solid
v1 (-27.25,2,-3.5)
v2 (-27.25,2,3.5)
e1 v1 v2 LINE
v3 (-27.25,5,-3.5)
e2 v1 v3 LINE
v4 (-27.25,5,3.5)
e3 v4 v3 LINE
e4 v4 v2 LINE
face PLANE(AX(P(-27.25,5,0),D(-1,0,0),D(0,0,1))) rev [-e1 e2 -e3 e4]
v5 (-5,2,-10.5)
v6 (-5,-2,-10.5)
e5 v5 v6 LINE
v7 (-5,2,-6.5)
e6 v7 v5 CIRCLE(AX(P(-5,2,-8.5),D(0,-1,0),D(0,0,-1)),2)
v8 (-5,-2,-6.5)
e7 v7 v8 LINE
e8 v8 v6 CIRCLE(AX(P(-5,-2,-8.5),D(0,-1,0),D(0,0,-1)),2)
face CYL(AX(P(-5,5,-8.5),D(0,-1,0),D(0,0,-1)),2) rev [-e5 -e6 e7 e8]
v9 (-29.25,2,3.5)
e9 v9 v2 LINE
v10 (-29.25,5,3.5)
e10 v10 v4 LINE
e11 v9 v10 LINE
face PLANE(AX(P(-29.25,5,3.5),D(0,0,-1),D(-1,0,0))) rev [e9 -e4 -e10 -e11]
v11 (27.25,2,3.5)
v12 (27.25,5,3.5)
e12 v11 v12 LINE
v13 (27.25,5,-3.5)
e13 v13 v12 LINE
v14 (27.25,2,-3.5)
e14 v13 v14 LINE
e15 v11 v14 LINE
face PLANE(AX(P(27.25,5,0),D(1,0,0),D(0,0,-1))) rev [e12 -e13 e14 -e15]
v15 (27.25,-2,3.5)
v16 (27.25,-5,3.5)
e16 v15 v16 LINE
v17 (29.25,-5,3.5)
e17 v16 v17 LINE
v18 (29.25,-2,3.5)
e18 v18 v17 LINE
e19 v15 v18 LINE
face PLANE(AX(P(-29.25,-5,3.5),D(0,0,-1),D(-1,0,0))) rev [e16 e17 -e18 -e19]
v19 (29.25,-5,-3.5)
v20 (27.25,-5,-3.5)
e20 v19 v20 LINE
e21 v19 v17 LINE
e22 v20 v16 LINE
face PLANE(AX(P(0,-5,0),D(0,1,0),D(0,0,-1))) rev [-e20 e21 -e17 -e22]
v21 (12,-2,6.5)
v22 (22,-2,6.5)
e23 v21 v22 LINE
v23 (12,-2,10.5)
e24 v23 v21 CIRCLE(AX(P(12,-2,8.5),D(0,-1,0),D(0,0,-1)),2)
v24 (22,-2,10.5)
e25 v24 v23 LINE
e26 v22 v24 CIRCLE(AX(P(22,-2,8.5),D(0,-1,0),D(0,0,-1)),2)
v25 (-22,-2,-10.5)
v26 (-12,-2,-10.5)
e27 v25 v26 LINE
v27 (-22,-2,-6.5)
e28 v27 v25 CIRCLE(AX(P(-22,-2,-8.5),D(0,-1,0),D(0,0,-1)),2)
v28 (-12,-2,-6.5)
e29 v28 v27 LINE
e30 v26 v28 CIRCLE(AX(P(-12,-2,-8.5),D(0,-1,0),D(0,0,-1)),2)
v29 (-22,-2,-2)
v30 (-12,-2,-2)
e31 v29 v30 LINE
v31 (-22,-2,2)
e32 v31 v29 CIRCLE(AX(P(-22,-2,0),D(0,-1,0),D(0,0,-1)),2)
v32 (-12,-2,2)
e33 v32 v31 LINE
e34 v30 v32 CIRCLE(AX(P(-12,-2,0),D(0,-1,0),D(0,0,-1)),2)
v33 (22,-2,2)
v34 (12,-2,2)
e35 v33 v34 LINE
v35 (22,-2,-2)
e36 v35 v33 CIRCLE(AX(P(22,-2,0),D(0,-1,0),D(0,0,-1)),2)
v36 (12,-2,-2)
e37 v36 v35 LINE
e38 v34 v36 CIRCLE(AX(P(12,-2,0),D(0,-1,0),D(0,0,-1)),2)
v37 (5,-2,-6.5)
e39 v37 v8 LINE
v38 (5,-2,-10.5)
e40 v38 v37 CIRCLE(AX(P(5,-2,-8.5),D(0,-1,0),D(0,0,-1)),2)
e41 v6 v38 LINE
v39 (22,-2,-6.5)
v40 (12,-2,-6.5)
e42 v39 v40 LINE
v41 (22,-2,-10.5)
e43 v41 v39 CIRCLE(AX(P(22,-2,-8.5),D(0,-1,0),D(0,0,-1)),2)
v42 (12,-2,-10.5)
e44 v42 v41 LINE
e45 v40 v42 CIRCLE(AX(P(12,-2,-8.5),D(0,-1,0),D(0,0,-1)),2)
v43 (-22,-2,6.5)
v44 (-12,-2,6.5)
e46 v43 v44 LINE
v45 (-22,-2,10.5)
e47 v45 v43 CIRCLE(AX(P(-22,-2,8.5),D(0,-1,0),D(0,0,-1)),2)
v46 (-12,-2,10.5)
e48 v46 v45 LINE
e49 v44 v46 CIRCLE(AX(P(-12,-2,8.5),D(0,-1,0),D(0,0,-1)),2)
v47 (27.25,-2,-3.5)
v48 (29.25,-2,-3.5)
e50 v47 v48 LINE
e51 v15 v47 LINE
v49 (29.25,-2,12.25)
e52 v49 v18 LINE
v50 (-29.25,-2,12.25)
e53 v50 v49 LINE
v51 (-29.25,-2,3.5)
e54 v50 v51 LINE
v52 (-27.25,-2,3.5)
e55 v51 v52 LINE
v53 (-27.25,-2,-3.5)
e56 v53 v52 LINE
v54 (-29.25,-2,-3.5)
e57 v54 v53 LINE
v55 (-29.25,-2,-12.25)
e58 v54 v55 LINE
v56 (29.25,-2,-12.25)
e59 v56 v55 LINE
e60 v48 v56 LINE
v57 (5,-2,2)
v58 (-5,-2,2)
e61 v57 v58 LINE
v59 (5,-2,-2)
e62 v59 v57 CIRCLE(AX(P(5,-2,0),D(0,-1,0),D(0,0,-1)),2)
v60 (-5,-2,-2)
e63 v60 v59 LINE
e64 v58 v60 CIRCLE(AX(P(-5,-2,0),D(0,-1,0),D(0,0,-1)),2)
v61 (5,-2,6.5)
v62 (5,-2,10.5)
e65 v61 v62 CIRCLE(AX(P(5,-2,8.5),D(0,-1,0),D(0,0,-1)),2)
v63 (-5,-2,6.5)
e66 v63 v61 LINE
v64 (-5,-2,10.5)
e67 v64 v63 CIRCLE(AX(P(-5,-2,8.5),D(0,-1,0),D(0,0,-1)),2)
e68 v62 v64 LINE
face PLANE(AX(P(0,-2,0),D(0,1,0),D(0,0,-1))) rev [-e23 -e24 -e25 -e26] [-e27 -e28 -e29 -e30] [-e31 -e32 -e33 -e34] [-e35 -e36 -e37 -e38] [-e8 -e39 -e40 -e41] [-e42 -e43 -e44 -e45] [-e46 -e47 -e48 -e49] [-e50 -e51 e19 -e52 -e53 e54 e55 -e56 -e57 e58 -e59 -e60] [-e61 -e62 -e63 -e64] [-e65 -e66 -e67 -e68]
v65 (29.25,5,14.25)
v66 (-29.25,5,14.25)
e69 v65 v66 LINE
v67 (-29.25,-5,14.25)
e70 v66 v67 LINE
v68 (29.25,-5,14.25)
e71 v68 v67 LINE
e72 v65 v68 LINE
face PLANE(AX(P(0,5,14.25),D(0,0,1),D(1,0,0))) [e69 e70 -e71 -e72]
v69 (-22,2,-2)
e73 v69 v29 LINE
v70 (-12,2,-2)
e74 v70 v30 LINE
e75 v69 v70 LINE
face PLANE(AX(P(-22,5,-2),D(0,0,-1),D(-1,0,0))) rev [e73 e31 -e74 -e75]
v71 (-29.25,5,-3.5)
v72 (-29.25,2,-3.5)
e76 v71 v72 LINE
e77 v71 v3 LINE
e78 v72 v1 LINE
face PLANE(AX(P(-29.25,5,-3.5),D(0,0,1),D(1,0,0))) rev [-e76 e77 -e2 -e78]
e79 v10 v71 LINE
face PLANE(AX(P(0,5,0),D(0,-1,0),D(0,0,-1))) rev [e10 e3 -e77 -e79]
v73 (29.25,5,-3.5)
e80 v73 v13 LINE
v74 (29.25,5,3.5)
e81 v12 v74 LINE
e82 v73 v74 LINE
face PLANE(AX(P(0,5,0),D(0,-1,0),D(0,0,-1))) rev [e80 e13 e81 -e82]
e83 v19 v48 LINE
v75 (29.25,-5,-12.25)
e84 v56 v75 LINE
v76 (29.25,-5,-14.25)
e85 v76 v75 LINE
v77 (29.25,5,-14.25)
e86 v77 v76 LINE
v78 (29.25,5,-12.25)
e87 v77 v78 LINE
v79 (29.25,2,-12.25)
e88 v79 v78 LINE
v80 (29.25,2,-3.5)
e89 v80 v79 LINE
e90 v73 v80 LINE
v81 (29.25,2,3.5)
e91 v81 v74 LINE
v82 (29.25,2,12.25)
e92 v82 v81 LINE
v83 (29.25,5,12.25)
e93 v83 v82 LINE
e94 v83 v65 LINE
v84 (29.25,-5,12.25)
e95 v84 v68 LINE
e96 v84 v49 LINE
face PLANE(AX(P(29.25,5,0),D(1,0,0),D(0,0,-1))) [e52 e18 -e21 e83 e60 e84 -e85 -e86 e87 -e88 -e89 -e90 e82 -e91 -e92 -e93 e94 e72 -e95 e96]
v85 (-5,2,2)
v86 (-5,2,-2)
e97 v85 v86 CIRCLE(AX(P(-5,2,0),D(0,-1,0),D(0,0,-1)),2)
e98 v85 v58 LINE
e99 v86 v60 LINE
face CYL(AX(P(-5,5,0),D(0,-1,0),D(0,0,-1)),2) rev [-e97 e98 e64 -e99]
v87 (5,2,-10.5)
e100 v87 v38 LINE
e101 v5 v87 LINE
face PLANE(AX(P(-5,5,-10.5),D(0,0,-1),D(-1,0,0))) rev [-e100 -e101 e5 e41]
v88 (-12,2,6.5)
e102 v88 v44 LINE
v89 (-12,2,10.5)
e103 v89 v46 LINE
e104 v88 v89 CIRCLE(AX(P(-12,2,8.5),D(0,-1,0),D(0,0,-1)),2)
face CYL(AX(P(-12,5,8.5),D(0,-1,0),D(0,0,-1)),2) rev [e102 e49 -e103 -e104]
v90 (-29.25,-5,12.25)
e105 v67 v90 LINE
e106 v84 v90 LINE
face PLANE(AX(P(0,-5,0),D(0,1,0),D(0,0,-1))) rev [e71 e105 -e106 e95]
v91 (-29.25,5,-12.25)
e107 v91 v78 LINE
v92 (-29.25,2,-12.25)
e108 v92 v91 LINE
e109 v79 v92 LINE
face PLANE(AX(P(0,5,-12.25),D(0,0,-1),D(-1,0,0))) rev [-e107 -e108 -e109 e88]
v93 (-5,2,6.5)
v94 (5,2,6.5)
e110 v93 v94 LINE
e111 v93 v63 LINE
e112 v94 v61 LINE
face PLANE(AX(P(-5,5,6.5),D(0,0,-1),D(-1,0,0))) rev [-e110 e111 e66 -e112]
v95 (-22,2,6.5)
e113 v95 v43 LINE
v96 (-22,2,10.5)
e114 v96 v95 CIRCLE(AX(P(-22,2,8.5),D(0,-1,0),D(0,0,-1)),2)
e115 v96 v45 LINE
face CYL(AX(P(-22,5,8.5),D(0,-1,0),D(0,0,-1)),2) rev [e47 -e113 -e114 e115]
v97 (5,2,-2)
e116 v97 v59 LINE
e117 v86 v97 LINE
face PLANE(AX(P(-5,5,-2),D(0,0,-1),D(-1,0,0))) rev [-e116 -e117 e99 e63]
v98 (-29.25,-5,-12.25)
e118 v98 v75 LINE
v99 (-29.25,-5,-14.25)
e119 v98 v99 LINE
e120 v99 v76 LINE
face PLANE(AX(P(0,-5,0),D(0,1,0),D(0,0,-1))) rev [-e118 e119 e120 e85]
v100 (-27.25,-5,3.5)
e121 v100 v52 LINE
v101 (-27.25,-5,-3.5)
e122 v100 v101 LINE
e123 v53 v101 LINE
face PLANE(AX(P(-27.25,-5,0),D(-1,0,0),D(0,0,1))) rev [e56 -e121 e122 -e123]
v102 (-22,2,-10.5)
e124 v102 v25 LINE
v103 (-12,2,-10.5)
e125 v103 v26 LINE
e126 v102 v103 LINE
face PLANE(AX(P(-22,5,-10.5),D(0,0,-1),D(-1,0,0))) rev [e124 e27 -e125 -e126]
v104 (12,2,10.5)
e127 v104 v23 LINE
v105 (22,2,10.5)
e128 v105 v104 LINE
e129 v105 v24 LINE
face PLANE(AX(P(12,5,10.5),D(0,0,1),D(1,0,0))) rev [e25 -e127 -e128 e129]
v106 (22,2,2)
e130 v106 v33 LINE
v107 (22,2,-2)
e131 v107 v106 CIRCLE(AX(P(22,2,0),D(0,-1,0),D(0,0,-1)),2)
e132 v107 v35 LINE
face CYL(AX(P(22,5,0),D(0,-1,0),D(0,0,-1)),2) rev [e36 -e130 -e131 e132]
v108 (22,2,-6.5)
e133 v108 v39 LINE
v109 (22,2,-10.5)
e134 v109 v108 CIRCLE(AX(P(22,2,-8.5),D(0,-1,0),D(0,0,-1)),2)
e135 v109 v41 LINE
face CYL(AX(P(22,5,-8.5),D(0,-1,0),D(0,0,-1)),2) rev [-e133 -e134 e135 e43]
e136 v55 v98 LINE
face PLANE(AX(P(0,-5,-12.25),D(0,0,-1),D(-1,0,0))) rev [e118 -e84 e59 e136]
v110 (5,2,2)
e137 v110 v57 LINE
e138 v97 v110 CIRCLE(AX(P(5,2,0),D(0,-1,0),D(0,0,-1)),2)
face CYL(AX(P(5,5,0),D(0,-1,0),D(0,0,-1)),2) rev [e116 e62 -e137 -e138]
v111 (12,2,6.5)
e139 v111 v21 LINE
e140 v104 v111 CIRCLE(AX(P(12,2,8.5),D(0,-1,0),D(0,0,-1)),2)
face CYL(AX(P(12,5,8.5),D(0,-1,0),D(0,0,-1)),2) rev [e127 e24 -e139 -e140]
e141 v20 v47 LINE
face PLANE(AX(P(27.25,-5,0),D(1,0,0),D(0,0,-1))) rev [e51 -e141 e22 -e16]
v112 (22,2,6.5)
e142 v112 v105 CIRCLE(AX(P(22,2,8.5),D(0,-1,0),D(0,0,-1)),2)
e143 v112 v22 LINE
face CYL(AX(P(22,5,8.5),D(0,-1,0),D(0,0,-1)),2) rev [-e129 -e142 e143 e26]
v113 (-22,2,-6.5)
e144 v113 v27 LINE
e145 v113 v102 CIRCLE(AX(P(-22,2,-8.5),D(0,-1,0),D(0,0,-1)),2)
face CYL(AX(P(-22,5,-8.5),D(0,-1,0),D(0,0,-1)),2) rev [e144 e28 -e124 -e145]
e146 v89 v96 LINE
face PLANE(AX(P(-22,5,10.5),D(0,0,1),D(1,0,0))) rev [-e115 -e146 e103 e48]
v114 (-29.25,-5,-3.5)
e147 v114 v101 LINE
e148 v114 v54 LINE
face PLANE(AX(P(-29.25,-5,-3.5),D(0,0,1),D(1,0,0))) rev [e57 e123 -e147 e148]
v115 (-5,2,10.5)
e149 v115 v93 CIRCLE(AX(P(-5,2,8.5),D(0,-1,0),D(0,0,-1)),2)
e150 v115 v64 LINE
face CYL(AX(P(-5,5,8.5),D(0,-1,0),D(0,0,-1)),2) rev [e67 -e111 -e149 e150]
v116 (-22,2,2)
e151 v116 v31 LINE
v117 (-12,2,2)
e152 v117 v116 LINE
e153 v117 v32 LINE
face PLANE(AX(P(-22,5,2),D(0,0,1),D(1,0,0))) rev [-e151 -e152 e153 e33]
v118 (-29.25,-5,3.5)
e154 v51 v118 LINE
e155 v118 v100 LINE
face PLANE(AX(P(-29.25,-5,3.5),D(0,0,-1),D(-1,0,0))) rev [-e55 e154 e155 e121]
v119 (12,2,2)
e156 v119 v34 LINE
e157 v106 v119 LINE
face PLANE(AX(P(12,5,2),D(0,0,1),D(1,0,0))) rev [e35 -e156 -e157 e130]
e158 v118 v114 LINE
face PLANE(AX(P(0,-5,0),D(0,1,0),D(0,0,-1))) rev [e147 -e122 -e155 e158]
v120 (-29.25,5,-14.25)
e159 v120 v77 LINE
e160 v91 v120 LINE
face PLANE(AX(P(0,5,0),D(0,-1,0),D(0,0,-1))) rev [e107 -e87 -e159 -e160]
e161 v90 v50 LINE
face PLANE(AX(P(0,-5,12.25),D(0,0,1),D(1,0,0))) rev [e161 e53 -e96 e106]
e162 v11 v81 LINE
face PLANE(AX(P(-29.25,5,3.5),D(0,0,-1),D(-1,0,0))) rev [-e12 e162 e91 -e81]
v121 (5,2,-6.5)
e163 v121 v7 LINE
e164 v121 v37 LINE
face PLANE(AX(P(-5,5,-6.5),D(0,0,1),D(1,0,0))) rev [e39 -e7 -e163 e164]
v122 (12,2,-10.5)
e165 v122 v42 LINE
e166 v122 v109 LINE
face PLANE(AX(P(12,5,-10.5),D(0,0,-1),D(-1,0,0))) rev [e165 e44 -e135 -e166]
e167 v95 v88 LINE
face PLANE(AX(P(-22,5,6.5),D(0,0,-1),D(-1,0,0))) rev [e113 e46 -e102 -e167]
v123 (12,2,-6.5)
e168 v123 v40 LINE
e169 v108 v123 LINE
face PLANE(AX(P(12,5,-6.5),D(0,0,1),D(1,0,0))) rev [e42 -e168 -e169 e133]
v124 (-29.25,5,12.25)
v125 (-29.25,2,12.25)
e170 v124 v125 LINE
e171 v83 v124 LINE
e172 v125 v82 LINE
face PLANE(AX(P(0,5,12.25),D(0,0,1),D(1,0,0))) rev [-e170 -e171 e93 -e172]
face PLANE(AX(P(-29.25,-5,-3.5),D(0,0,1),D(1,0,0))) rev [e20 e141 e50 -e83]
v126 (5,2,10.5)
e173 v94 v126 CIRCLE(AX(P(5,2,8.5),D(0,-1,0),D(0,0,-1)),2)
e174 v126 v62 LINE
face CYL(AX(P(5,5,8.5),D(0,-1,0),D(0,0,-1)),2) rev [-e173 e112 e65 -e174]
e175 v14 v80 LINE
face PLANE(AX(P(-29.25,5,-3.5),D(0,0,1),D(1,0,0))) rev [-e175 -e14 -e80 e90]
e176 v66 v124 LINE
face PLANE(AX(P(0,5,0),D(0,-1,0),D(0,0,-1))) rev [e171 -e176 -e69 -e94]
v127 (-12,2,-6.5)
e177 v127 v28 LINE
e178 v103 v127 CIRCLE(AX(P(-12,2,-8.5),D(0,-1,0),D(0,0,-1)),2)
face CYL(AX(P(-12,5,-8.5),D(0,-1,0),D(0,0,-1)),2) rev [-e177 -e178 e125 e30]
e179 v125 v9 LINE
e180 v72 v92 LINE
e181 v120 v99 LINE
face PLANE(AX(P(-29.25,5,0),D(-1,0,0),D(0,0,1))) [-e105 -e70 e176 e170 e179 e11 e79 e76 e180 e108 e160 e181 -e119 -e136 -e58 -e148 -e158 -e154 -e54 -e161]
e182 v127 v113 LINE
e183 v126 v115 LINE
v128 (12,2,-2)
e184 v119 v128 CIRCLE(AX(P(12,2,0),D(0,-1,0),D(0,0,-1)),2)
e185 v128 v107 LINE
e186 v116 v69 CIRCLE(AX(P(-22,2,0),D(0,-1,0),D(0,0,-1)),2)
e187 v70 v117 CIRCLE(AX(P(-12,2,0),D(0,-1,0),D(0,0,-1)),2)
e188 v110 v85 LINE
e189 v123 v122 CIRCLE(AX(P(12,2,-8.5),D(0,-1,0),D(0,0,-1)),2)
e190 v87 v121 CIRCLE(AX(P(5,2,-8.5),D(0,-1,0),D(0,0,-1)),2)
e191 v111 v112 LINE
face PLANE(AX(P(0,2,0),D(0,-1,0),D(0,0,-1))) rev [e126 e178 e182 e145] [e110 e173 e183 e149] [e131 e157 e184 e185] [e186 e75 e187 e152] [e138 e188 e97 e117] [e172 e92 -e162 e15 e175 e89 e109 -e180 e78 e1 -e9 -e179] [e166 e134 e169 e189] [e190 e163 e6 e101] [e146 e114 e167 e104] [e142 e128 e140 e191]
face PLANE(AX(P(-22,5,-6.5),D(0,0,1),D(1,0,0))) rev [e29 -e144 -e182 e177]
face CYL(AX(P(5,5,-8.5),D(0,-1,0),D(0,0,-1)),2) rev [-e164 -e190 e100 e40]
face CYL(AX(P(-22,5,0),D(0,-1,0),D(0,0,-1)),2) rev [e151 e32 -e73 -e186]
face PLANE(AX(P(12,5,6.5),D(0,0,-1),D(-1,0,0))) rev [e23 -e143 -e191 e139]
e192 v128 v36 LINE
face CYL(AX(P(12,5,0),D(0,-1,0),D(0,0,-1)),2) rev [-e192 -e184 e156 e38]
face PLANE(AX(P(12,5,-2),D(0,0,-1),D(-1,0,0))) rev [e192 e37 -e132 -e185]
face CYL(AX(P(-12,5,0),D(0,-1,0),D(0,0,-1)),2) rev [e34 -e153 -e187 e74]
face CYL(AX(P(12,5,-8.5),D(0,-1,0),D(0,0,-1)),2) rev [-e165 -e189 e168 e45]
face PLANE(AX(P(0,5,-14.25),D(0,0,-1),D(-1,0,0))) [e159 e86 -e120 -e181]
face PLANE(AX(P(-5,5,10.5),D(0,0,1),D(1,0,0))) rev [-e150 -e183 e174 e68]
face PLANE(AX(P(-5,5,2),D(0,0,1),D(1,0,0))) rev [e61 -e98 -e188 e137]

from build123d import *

# Parameters (mm, degrees)
SKETCH1_W           = 54.5
SKETCH1_H           = 24.5
BOSS_EXTRUDE1_DEPTH = 2
BOSS_EXTRUDE2_START = -2
SKETCH2_W           = 58.5
SKETCH2_H           = 28.5
SKETCH2_W_2         = 54.5
SKETCH2_H_2         = 24.5
BOSS_EXTRUDE2_DEPTH = 5
CUT_EXTRUDE1_DEPTH  = 33.918459867
FILL_PATTERN1_DEPTH = 2
LPATTERN1_COUNT     = 2
LPATTERN1_PITCH     = 8.5
LPATTERN1_COL_COUNT = 2
LPATTERN1_COL_PITCH = 8.5
SKETCH13_W          = 8.75
SKETCH13_H          = 3
CUT_EXTRUDE2_DEPTH  = 61.417816081


# Read off the part's stored shape, not the designer's step: Fill Pattern1
with BuildPart() as part:
    # Sketch1 → Boss-Extrude1 (new body)
    with BuildSketch(Plane(origin=(0, 0, 0), x_dir=(1, 0, 0), z_dir=(0, 1, 0))):
        Rectangle(SKETCH1_W, SKETCH1_H)
    extrude(amount=BOSS_EXTRUDE1_DEPTH)

    # Sketch2 → Boss-Extrude2 (add)
    with BuildSketch(Plane(origin=(0, 2, 0), x_dir=(1, 0, 0), z_dir=(0, 1, 0)).offset(BOSS_EXTRUDE2_START)):
        Rectangle(SKETCH2_W, SKETCH2_H)
        Rectangle(SKETCH2_W_2, SKETCH2_H_2, mode=Mode.SUBTRACT)
    extrude(amount=BOSS_EXTRUDE2_DEPTH)

    # Sketch5 → Cut-Extrude1 (cut, through all)
    with BuildSketch(Plane.XZ):
        with BuildLine():
            Line((-5, 2), (5, 2))
            ThreePointArc((5, 2), (7, 0), (5, -2))
            Line((5, -2), (-5, -2))
            ThreePointArc((-5, -2), (-7, 0), (-5, 2))
        make_face()
    cut_extrude1 = extrude(amount=-CUT_EXTRUDE1_DEPTH, mode=Mode.SUBTRACT)

    # Fill Pattern1 outline → Fill Pattern1 (cut)
    with BuildSketch(Plane(origin=(0, 0, 0), x_dir=(1, 0, 0), z_dir=(0, 1, 0))):
        with BuildLine():
            ThreePointArc((-22, 2), (-24, 0), (-22, -2))
            Line((-22, -2), (-12, -2))
            ThreePointArc((-12, -2), (-10, 0), (-12, 2))
            Line((-12, 2), (-22, 2))
        make_face()
        with BuildLine():
            ThreePointArc((12, 2), (10, 0), (12, -2))
            Line((12, -2), (22, -2))
            ThreePointArc((22, -2), (24, 0), (22, 2))
            Line((22, 2), (12, 2))
        make_face()
        with BuildLine():
            ThreePointArc((-22, 10.5), (-24, 8.5), (-22, 6.5))
            Line((-22, 6.5), (-12, 6.5))
            ThreePointArc((-12, 6.5), (-10, 8.5), (-12, 10.5))
            Line((-12, 10.5), (-22, 10.5))
        make_face()
        with BuildLine():
            ThreePointArc((12, 10.5), (10, 8.5), (12, 6.5))
            Line((12, 6.5), (22, 6.5))
            ThreePointArc((22, 6.5), (24, 8.5), (22, 10.5))
            Line((22, 10.5), (12, 10.5))
        make_face()
        with BuildLine():
            ThreePointArc((-22, -6.5), (-24, -8.5), (-22, -10.5))
            Line((-22, -10.5), (-12, -10.5))
            ThreePointArc((-12, -10.5), (-10, -8.5), (-12, -6.5))
            Line((-12, -6.5), (-22, -6.5))
        make_face()
        with BuildLine():
            ThreePointArc((12, -6.5), (10, -8.5), (12, -10.5))
            Line((12, -10.5), (22, -10.5))
            ThreePointArc((22, -10.5), (24, -8.5), (22, -6.5))
            Line((22, -6.5), (12, -6.5))
        make_face()
    extrude(amount=FILL_PATTERN1_DEPTH, mode=Mode.SUBTRACT)

    # LPattern1: Cut-Extrude1 ×2
    with Locations(*[(0, 0, i * LPATTERN1_PITCH) for i in range(1, LPATTERN1_COUNT)]):
        add(cut_extrude1, mode=Mode.SUBTRACT)

    # LPattern1 col: Cut-Extrude1 ×2
    with Locations(*[(0, 0, -i * LPATTERN1_COL_PITCH) for i in range(1, LPATTERN1_COL_COUNT)]):
        add(cut_extrude1, mode=Mode.SUBTRACT)

    # Sketch13 → Cut-Extrude2 (cut, through all)
    with BuildSketch(Plane(origin=(29.25, 0, 0), x_dir=(0, 0, -1), z_dir=(1, 0, 0))):
        with Locations((-7.875, 3.5)):
            Rectangle(SKETCH13_W, SKETCH13_H)
        with Locations((7.875, 3.5)):
            Rectangle(SKETCH13_W, SKETCH13_H)
    extrude(amount=-CUT_EXTRUDE2_DEPTH, mode=Mode.SUBTRACT)

    # Mirror1: part across plane


with BuildPart() as part_1:
    add(part.part)
    add(part.part.mirror(Plane(origin=(0, 0, 0), x_dir=(0, 0, 1), z_dir=(0, -1, 0))))


solid = part_1.part
